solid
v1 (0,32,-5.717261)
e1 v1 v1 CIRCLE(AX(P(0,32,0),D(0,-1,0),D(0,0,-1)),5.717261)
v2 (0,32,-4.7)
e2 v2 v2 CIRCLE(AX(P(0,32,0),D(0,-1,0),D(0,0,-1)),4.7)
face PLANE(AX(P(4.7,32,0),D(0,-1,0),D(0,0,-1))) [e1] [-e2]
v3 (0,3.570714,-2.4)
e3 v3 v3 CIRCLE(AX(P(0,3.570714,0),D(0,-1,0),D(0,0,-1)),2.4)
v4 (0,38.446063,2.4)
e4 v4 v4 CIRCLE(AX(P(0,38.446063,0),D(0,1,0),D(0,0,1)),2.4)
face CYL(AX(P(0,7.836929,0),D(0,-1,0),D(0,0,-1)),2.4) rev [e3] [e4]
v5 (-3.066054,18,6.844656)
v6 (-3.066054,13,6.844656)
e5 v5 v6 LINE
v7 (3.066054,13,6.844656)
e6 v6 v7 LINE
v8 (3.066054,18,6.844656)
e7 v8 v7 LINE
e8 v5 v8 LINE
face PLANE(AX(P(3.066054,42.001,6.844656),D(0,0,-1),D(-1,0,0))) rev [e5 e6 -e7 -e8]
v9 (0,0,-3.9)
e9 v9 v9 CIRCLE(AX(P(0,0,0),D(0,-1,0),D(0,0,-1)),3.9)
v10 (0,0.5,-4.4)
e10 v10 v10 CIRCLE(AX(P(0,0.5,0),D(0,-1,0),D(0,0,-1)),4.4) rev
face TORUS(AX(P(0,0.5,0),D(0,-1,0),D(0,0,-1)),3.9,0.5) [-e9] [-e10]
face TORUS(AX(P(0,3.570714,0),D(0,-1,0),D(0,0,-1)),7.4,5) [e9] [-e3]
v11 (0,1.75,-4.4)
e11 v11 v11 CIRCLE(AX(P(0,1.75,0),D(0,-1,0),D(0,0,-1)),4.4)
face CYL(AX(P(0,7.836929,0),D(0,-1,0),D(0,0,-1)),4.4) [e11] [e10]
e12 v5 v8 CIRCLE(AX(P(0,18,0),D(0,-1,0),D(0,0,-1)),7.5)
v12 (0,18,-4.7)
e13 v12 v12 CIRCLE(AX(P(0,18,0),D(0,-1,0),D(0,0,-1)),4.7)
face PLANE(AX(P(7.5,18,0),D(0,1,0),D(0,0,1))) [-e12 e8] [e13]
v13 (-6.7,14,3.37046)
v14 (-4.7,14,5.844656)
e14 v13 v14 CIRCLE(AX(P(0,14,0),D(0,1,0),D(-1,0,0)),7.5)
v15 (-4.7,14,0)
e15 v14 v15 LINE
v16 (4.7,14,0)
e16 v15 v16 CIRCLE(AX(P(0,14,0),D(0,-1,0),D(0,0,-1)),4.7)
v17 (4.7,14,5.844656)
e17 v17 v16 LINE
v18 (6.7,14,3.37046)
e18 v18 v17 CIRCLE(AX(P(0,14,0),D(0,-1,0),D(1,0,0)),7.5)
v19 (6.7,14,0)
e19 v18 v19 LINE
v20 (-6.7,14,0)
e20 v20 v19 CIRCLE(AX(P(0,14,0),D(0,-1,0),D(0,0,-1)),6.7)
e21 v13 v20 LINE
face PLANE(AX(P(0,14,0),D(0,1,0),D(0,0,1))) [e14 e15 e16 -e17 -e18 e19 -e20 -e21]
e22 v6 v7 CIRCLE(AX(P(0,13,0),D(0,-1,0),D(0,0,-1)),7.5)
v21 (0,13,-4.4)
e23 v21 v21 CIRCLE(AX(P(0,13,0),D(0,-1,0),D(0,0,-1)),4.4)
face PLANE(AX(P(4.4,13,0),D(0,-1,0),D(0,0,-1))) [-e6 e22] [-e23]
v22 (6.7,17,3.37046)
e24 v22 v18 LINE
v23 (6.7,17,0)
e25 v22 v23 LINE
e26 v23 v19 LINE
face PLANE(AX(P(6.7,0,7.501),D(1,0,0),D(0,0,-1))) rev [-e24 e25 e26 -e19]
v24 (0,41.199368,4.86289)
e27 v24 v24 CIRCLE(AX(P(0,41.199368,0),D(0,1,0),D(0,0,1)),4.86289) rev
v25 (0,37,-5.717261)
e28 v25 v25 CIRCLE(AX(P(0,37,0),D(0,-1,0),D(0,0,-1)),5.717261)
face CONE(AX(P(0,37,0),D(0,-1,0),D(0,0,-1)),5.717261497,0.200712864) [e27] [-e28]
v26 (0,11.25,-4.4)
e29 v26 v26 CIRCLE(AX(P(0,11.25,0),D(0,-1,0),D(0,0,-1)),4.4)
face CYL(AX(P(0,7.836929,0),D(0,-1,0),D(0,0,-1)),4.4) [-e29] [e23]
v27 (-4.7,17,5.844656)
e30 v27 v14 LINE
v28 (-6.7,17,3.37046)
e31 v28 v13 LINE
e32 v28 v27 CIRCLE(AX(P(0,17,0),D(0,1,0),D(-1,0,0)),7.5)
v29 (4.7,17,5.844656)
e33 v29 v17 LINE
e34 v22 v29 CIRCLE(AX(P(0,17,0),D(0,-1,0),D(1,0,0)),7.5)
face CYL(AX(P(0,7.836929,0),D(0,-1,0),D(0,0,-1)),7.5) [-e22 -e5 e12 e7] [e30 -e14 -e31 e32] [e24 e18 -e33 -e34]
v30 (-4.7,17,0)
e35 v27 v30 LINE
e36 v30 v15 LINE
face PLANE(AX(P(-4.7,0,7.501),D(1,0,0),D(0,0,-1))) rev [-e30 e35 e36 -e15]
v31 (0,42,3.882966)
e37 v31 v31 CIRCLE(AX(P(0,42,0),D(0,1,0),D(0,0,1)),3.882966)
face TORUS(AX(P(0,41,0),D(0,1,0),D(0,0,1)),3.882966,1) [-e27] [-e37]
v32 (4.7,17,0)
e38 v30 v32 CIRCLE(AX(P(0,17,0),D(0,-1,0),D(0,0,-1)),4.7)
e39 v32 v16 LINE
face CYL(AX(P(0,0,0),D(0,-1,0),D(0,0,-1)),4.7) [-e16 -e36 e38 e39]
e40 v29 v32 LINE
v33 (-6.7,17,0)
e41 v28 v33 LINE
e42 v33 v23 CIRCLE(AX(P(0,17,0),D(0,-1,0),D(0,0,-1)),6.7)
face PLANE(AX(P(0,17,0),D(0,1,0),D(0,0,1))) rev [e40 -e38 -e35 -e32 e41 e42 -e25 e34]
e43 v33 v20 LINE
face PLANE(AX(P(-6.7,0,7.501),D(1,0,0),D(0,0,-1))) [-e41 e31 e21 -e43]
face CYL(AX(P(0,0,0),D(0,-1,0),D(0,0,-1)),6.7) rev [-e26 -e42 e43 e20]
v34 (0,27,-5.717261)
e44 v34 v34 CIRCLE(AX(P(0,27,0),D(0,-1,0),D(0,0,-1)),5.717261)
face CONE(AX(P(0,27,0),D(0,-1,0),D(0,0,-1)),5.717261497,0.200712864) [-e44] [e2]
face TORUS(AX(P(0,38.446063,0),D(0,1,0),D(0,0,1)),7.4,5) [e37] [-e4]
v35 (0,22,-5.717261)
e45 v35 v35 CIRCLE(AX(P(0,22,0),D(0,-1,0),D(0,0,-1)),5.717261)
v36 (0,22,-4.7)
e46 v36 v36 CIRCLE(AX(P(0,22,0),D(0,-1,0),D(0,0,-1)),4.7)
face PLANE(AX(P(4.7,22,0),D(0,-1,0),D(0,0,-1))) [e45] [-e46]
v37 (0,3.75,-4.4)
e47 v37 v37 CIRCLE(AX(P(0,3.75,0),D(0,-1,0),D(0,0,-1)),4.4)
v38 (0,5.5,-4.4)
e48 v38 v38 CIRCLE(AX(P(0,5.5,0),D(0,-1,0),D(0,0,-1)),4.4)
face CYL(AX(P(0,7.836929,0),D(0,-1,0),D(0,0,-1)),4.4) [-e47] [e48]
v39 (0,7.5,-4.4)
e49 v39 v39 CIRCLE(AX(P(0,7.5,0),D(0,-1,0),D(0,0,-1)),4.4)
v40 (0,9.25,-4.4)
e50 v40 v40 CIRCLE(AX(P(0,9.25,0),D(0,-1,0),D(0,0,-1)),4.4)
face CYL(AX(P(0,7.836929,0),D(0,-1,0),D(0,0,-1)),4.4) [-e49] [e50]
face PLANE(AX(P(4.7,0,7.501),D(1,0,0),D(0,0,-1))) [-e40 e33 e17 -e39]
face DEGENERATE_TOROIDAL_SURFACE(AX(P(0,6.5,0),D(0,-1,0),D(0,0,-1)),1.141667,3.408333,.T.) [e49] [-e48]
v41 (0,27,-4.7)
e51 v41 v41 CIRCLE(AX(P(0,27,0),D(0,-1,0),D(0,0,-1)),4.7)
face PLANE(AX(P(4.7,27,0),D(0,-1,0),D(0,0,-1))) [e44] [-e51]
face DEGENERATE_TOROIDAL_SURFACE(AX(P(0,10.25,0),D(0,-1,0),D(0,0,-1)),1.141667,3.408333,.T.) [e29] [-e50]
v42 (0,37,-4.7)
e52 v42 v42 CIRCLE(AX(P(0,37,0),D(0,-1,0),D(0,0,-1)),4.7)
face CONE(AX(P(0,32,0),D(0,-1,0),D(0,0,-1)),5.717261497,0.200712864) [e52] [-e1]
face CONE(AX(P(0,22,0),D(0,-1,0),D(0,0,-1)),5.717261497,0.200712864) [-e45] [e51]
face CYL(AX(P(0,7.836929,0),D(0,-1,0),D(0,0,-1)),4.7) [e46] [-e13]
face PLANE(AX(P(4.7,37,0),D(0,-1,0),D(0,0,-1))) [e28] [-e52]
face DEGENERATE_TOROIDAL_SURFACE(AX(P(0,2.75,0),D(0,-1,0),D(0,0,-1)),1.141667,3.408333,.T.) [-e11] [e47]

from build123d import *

# Parameters (mm, degrees)
FILLET1_R               = 1
SKETCH2_W               = 2
SKETCH2_H               = 3
CUT_REVOLVE1_ANGLE      = 180
CUT_EXTRUDE1_REACH      = 45.319
CUT_EXTRUDE1_END_RADIUS = 7.5
SKETCH2_3_W             = 2
SKETCH2_3_H             = 3
CUT_EXTRUDE2_REACH      = 32.879
FILLET2_R               = 0.5
FILLET3_R               = 5


with BuildPart() as part:
    # Sketch1 → Revolve1 (revolve)
    with BuildSketch(Plane.XY, mode=Mode.PRIVATE) as revolve1_sk:
        with BuildLine():
            Line((2.4, 42), (2.4, 0))
            Line((2.4, 0), (4.4, 0))
            Line((4.4, 0), (4.4, 1.75))
            ThreePointArc((4.4, 1.75), (4.55, 2.75), (4.4, 3.75))
            Line((4.4, 3.75), (4.4, 5.5))
            ThreePointArc((4.4, 5.5), (4.55, 6.5), (4.4, 7.5))
            Line((4.4, 7.5), (4.4, 9.25))
            ThreePointArc((4.4, 9.25), (4.55, 10.25), (4.4, 11.25))
            Line((4.4, 11.25), (4.4, 13))
            Line((4.4, 13), (7.5, 13))
            Line((7.5, 13), (7.5, 18))
            Line((7.5, 18), (4.7, 18))
            Line((4.7, 18), (4.7, 22))
            Line((4.7, 22), (5.717261497, 22))
            Line((5.717261497, 22), (4.7, 27))
            Line((4.7, 27), (5.717261497, 27))
            Line((5.717261497, 27), (4.7, 32))
            Line((4.7, 32), (5.717261497, 32))
            Line((5.717261497, 32), (4.7, 37))
            Line((4.7, 37), (5.717261497, 37))
            Line((5.717261497, 37), (4.7, 42))
            Line((4.7, 42), (2.4, 42))
        make_face()
    revolve(revolve1_sk.sketch.rotate(Axis((0, 7.836928881, 0), (0, 1, 0)), 90), axis=Axis((0, 7.836928881, 0), (0, 1, 0)))

    # Fillet1
    fillet1_edges = [part.edges().sort_by_distance(p)[0] for p in [
        (0, 42, 4.7),
    ]]
    fillet(fillet1_edges, radius=FILLET1_R)

    # Sketch2 → Cut-Revolve1 (revolve, cut)
    with BuildSketch(Plane.XY):
        with Locations((5.7, 15.5)):
            Rectangle(SKETCH2_W, SKETCH2_H)
    revolve(axis=Axis((0, 0, 0), (0, 1, 0)), revolution_arc=CUT_REVOLVE1_ANGLE, mode=Mode.SUBTRACT)

    # Cut-Extrude1: up to this cylinder (the profile starts inside it)
    cut_extrude1_end = Plane(origin=(0, 15.5, 0), z_dir=(0, -1, 0)) * Cylinder(CUT_EXTRUDE1_END_RADIUS, 106.638, mode=Mode.PRIVATE)
    # Sketch2<3> → Cut-Extrude1 (cut, up to the surface)
    with BuildSketch(Plane.XY, mode=Mode.PRIVATE) as cut_extrude1_sk1:
        with Locations((-5.7, 15.5)):
            Rectangle(SKETCH2_3_W, SKETCH2_3_H)
    cut_extrude1_tool1 = extrude(cut_extrude1_sk1.sketch, amount=CUT_EXTRUDE1_REACH, mode=Mode.PRIVATE) & cut_extrude1_end
    add(cut_extrude1_tool1.solids().sort_by_distance((-5.7, 15.5, 0))[0], mode=Mode.SUBTRACT)
    # Sketch2<3> → Cut-Extrude1 (cut, up to the surface)
    with BuildSketch(Plane.XY, mode=Mode.PRIVATE) as cut_extrude1_sk2:
        with Locations((5.7, 15.5)):
            Rectangle(SKETCH2_3_W, SKETCH2_3_H)
    cut_extrude1_tool2 = extrude(cut_extrude1_sk2.sketch, amount=CUT_EXTRUDE1_REACH, mode=Mode.PRIVATE) & cut_extrude1_end
    add(cut_extrude1_tool2.solids().sort_by_distance((5.7, 15.5, 0))[0], mode=Mode.SUBTRACT)

    # Sketch3 → Cut-Extrude2 (cut, up to next)
    with BuildSketch(Plane.XZ.offset(-13), mode=Mode.PRIVATE) as cut_extrude2_sk1:
        with BuildLine():
            Line((3.066054247, 6.844655678), (-3.066054247, 6.844655678))
            ThreePointArc((-3.066054247, 6.844655678), (0, 7.5), (3.066054247, 6.844655678))
        make_face()
    cut_extrude2_tool1 = extrude(cut_extrude2_sk1.sketch, amount=-CUT_EXTRUDE2_REACH, mode=Mode.PRIVATE) & part.part
    add(cut_extrude2_tool1.solids().sort_by_distance((0, 13, 7.107801))[0], mode=Mode.SUBTRACT)

    # Fillet2
    fillet2_edges = [part.edges().sort_by_distance(p)[0] for p in [
        (0, 0, 4.4),
    ]]
    fillet(fillet2_edges, radius=FILLET2_R)

    # Fillet3
    # the kernel refuses this fillet: 5 mm, written as the material it takes off along each edge
    with BuildSketch(Plane(origin=(0, 0, 0), x_dir=(0, 0, -1), z_dir=(1, 0, 0))) as fillet3_piece_1:
        with BuildLine():
            CenterArc((7.4, 3.570714214), FILLET3_R, 180, 45.572995999)
            Line((2.4, 3.570714214), (2.4, 0))
            Line((2.4, 0), (3.9, 0))
        make_face()
    revolve(axis=Axis((0, 0, 0), (0, 1, 0)), mode=Mode.SUBTRACT)
    with BuildSketch(Plane(origin=(0, 42, 0), x_dir=(0, 0, -1), z_dir=(1, 0, 0))) as fillet3_piece_2:
        with BuildLine():
            CenterArc((7.4, -3.553937245), FILLET3_R, 134.700979484, 45.299020516)
            Line((3.88296573, 0), (2.4, 0))
            Line((2.4, 0), (2.4, -3.553937245))
        make_face()
    revolve(axis=Axis((0, 42, 0), (0, 1, 0)), mode=Mode.SUBTRACT)


solid = part.part
